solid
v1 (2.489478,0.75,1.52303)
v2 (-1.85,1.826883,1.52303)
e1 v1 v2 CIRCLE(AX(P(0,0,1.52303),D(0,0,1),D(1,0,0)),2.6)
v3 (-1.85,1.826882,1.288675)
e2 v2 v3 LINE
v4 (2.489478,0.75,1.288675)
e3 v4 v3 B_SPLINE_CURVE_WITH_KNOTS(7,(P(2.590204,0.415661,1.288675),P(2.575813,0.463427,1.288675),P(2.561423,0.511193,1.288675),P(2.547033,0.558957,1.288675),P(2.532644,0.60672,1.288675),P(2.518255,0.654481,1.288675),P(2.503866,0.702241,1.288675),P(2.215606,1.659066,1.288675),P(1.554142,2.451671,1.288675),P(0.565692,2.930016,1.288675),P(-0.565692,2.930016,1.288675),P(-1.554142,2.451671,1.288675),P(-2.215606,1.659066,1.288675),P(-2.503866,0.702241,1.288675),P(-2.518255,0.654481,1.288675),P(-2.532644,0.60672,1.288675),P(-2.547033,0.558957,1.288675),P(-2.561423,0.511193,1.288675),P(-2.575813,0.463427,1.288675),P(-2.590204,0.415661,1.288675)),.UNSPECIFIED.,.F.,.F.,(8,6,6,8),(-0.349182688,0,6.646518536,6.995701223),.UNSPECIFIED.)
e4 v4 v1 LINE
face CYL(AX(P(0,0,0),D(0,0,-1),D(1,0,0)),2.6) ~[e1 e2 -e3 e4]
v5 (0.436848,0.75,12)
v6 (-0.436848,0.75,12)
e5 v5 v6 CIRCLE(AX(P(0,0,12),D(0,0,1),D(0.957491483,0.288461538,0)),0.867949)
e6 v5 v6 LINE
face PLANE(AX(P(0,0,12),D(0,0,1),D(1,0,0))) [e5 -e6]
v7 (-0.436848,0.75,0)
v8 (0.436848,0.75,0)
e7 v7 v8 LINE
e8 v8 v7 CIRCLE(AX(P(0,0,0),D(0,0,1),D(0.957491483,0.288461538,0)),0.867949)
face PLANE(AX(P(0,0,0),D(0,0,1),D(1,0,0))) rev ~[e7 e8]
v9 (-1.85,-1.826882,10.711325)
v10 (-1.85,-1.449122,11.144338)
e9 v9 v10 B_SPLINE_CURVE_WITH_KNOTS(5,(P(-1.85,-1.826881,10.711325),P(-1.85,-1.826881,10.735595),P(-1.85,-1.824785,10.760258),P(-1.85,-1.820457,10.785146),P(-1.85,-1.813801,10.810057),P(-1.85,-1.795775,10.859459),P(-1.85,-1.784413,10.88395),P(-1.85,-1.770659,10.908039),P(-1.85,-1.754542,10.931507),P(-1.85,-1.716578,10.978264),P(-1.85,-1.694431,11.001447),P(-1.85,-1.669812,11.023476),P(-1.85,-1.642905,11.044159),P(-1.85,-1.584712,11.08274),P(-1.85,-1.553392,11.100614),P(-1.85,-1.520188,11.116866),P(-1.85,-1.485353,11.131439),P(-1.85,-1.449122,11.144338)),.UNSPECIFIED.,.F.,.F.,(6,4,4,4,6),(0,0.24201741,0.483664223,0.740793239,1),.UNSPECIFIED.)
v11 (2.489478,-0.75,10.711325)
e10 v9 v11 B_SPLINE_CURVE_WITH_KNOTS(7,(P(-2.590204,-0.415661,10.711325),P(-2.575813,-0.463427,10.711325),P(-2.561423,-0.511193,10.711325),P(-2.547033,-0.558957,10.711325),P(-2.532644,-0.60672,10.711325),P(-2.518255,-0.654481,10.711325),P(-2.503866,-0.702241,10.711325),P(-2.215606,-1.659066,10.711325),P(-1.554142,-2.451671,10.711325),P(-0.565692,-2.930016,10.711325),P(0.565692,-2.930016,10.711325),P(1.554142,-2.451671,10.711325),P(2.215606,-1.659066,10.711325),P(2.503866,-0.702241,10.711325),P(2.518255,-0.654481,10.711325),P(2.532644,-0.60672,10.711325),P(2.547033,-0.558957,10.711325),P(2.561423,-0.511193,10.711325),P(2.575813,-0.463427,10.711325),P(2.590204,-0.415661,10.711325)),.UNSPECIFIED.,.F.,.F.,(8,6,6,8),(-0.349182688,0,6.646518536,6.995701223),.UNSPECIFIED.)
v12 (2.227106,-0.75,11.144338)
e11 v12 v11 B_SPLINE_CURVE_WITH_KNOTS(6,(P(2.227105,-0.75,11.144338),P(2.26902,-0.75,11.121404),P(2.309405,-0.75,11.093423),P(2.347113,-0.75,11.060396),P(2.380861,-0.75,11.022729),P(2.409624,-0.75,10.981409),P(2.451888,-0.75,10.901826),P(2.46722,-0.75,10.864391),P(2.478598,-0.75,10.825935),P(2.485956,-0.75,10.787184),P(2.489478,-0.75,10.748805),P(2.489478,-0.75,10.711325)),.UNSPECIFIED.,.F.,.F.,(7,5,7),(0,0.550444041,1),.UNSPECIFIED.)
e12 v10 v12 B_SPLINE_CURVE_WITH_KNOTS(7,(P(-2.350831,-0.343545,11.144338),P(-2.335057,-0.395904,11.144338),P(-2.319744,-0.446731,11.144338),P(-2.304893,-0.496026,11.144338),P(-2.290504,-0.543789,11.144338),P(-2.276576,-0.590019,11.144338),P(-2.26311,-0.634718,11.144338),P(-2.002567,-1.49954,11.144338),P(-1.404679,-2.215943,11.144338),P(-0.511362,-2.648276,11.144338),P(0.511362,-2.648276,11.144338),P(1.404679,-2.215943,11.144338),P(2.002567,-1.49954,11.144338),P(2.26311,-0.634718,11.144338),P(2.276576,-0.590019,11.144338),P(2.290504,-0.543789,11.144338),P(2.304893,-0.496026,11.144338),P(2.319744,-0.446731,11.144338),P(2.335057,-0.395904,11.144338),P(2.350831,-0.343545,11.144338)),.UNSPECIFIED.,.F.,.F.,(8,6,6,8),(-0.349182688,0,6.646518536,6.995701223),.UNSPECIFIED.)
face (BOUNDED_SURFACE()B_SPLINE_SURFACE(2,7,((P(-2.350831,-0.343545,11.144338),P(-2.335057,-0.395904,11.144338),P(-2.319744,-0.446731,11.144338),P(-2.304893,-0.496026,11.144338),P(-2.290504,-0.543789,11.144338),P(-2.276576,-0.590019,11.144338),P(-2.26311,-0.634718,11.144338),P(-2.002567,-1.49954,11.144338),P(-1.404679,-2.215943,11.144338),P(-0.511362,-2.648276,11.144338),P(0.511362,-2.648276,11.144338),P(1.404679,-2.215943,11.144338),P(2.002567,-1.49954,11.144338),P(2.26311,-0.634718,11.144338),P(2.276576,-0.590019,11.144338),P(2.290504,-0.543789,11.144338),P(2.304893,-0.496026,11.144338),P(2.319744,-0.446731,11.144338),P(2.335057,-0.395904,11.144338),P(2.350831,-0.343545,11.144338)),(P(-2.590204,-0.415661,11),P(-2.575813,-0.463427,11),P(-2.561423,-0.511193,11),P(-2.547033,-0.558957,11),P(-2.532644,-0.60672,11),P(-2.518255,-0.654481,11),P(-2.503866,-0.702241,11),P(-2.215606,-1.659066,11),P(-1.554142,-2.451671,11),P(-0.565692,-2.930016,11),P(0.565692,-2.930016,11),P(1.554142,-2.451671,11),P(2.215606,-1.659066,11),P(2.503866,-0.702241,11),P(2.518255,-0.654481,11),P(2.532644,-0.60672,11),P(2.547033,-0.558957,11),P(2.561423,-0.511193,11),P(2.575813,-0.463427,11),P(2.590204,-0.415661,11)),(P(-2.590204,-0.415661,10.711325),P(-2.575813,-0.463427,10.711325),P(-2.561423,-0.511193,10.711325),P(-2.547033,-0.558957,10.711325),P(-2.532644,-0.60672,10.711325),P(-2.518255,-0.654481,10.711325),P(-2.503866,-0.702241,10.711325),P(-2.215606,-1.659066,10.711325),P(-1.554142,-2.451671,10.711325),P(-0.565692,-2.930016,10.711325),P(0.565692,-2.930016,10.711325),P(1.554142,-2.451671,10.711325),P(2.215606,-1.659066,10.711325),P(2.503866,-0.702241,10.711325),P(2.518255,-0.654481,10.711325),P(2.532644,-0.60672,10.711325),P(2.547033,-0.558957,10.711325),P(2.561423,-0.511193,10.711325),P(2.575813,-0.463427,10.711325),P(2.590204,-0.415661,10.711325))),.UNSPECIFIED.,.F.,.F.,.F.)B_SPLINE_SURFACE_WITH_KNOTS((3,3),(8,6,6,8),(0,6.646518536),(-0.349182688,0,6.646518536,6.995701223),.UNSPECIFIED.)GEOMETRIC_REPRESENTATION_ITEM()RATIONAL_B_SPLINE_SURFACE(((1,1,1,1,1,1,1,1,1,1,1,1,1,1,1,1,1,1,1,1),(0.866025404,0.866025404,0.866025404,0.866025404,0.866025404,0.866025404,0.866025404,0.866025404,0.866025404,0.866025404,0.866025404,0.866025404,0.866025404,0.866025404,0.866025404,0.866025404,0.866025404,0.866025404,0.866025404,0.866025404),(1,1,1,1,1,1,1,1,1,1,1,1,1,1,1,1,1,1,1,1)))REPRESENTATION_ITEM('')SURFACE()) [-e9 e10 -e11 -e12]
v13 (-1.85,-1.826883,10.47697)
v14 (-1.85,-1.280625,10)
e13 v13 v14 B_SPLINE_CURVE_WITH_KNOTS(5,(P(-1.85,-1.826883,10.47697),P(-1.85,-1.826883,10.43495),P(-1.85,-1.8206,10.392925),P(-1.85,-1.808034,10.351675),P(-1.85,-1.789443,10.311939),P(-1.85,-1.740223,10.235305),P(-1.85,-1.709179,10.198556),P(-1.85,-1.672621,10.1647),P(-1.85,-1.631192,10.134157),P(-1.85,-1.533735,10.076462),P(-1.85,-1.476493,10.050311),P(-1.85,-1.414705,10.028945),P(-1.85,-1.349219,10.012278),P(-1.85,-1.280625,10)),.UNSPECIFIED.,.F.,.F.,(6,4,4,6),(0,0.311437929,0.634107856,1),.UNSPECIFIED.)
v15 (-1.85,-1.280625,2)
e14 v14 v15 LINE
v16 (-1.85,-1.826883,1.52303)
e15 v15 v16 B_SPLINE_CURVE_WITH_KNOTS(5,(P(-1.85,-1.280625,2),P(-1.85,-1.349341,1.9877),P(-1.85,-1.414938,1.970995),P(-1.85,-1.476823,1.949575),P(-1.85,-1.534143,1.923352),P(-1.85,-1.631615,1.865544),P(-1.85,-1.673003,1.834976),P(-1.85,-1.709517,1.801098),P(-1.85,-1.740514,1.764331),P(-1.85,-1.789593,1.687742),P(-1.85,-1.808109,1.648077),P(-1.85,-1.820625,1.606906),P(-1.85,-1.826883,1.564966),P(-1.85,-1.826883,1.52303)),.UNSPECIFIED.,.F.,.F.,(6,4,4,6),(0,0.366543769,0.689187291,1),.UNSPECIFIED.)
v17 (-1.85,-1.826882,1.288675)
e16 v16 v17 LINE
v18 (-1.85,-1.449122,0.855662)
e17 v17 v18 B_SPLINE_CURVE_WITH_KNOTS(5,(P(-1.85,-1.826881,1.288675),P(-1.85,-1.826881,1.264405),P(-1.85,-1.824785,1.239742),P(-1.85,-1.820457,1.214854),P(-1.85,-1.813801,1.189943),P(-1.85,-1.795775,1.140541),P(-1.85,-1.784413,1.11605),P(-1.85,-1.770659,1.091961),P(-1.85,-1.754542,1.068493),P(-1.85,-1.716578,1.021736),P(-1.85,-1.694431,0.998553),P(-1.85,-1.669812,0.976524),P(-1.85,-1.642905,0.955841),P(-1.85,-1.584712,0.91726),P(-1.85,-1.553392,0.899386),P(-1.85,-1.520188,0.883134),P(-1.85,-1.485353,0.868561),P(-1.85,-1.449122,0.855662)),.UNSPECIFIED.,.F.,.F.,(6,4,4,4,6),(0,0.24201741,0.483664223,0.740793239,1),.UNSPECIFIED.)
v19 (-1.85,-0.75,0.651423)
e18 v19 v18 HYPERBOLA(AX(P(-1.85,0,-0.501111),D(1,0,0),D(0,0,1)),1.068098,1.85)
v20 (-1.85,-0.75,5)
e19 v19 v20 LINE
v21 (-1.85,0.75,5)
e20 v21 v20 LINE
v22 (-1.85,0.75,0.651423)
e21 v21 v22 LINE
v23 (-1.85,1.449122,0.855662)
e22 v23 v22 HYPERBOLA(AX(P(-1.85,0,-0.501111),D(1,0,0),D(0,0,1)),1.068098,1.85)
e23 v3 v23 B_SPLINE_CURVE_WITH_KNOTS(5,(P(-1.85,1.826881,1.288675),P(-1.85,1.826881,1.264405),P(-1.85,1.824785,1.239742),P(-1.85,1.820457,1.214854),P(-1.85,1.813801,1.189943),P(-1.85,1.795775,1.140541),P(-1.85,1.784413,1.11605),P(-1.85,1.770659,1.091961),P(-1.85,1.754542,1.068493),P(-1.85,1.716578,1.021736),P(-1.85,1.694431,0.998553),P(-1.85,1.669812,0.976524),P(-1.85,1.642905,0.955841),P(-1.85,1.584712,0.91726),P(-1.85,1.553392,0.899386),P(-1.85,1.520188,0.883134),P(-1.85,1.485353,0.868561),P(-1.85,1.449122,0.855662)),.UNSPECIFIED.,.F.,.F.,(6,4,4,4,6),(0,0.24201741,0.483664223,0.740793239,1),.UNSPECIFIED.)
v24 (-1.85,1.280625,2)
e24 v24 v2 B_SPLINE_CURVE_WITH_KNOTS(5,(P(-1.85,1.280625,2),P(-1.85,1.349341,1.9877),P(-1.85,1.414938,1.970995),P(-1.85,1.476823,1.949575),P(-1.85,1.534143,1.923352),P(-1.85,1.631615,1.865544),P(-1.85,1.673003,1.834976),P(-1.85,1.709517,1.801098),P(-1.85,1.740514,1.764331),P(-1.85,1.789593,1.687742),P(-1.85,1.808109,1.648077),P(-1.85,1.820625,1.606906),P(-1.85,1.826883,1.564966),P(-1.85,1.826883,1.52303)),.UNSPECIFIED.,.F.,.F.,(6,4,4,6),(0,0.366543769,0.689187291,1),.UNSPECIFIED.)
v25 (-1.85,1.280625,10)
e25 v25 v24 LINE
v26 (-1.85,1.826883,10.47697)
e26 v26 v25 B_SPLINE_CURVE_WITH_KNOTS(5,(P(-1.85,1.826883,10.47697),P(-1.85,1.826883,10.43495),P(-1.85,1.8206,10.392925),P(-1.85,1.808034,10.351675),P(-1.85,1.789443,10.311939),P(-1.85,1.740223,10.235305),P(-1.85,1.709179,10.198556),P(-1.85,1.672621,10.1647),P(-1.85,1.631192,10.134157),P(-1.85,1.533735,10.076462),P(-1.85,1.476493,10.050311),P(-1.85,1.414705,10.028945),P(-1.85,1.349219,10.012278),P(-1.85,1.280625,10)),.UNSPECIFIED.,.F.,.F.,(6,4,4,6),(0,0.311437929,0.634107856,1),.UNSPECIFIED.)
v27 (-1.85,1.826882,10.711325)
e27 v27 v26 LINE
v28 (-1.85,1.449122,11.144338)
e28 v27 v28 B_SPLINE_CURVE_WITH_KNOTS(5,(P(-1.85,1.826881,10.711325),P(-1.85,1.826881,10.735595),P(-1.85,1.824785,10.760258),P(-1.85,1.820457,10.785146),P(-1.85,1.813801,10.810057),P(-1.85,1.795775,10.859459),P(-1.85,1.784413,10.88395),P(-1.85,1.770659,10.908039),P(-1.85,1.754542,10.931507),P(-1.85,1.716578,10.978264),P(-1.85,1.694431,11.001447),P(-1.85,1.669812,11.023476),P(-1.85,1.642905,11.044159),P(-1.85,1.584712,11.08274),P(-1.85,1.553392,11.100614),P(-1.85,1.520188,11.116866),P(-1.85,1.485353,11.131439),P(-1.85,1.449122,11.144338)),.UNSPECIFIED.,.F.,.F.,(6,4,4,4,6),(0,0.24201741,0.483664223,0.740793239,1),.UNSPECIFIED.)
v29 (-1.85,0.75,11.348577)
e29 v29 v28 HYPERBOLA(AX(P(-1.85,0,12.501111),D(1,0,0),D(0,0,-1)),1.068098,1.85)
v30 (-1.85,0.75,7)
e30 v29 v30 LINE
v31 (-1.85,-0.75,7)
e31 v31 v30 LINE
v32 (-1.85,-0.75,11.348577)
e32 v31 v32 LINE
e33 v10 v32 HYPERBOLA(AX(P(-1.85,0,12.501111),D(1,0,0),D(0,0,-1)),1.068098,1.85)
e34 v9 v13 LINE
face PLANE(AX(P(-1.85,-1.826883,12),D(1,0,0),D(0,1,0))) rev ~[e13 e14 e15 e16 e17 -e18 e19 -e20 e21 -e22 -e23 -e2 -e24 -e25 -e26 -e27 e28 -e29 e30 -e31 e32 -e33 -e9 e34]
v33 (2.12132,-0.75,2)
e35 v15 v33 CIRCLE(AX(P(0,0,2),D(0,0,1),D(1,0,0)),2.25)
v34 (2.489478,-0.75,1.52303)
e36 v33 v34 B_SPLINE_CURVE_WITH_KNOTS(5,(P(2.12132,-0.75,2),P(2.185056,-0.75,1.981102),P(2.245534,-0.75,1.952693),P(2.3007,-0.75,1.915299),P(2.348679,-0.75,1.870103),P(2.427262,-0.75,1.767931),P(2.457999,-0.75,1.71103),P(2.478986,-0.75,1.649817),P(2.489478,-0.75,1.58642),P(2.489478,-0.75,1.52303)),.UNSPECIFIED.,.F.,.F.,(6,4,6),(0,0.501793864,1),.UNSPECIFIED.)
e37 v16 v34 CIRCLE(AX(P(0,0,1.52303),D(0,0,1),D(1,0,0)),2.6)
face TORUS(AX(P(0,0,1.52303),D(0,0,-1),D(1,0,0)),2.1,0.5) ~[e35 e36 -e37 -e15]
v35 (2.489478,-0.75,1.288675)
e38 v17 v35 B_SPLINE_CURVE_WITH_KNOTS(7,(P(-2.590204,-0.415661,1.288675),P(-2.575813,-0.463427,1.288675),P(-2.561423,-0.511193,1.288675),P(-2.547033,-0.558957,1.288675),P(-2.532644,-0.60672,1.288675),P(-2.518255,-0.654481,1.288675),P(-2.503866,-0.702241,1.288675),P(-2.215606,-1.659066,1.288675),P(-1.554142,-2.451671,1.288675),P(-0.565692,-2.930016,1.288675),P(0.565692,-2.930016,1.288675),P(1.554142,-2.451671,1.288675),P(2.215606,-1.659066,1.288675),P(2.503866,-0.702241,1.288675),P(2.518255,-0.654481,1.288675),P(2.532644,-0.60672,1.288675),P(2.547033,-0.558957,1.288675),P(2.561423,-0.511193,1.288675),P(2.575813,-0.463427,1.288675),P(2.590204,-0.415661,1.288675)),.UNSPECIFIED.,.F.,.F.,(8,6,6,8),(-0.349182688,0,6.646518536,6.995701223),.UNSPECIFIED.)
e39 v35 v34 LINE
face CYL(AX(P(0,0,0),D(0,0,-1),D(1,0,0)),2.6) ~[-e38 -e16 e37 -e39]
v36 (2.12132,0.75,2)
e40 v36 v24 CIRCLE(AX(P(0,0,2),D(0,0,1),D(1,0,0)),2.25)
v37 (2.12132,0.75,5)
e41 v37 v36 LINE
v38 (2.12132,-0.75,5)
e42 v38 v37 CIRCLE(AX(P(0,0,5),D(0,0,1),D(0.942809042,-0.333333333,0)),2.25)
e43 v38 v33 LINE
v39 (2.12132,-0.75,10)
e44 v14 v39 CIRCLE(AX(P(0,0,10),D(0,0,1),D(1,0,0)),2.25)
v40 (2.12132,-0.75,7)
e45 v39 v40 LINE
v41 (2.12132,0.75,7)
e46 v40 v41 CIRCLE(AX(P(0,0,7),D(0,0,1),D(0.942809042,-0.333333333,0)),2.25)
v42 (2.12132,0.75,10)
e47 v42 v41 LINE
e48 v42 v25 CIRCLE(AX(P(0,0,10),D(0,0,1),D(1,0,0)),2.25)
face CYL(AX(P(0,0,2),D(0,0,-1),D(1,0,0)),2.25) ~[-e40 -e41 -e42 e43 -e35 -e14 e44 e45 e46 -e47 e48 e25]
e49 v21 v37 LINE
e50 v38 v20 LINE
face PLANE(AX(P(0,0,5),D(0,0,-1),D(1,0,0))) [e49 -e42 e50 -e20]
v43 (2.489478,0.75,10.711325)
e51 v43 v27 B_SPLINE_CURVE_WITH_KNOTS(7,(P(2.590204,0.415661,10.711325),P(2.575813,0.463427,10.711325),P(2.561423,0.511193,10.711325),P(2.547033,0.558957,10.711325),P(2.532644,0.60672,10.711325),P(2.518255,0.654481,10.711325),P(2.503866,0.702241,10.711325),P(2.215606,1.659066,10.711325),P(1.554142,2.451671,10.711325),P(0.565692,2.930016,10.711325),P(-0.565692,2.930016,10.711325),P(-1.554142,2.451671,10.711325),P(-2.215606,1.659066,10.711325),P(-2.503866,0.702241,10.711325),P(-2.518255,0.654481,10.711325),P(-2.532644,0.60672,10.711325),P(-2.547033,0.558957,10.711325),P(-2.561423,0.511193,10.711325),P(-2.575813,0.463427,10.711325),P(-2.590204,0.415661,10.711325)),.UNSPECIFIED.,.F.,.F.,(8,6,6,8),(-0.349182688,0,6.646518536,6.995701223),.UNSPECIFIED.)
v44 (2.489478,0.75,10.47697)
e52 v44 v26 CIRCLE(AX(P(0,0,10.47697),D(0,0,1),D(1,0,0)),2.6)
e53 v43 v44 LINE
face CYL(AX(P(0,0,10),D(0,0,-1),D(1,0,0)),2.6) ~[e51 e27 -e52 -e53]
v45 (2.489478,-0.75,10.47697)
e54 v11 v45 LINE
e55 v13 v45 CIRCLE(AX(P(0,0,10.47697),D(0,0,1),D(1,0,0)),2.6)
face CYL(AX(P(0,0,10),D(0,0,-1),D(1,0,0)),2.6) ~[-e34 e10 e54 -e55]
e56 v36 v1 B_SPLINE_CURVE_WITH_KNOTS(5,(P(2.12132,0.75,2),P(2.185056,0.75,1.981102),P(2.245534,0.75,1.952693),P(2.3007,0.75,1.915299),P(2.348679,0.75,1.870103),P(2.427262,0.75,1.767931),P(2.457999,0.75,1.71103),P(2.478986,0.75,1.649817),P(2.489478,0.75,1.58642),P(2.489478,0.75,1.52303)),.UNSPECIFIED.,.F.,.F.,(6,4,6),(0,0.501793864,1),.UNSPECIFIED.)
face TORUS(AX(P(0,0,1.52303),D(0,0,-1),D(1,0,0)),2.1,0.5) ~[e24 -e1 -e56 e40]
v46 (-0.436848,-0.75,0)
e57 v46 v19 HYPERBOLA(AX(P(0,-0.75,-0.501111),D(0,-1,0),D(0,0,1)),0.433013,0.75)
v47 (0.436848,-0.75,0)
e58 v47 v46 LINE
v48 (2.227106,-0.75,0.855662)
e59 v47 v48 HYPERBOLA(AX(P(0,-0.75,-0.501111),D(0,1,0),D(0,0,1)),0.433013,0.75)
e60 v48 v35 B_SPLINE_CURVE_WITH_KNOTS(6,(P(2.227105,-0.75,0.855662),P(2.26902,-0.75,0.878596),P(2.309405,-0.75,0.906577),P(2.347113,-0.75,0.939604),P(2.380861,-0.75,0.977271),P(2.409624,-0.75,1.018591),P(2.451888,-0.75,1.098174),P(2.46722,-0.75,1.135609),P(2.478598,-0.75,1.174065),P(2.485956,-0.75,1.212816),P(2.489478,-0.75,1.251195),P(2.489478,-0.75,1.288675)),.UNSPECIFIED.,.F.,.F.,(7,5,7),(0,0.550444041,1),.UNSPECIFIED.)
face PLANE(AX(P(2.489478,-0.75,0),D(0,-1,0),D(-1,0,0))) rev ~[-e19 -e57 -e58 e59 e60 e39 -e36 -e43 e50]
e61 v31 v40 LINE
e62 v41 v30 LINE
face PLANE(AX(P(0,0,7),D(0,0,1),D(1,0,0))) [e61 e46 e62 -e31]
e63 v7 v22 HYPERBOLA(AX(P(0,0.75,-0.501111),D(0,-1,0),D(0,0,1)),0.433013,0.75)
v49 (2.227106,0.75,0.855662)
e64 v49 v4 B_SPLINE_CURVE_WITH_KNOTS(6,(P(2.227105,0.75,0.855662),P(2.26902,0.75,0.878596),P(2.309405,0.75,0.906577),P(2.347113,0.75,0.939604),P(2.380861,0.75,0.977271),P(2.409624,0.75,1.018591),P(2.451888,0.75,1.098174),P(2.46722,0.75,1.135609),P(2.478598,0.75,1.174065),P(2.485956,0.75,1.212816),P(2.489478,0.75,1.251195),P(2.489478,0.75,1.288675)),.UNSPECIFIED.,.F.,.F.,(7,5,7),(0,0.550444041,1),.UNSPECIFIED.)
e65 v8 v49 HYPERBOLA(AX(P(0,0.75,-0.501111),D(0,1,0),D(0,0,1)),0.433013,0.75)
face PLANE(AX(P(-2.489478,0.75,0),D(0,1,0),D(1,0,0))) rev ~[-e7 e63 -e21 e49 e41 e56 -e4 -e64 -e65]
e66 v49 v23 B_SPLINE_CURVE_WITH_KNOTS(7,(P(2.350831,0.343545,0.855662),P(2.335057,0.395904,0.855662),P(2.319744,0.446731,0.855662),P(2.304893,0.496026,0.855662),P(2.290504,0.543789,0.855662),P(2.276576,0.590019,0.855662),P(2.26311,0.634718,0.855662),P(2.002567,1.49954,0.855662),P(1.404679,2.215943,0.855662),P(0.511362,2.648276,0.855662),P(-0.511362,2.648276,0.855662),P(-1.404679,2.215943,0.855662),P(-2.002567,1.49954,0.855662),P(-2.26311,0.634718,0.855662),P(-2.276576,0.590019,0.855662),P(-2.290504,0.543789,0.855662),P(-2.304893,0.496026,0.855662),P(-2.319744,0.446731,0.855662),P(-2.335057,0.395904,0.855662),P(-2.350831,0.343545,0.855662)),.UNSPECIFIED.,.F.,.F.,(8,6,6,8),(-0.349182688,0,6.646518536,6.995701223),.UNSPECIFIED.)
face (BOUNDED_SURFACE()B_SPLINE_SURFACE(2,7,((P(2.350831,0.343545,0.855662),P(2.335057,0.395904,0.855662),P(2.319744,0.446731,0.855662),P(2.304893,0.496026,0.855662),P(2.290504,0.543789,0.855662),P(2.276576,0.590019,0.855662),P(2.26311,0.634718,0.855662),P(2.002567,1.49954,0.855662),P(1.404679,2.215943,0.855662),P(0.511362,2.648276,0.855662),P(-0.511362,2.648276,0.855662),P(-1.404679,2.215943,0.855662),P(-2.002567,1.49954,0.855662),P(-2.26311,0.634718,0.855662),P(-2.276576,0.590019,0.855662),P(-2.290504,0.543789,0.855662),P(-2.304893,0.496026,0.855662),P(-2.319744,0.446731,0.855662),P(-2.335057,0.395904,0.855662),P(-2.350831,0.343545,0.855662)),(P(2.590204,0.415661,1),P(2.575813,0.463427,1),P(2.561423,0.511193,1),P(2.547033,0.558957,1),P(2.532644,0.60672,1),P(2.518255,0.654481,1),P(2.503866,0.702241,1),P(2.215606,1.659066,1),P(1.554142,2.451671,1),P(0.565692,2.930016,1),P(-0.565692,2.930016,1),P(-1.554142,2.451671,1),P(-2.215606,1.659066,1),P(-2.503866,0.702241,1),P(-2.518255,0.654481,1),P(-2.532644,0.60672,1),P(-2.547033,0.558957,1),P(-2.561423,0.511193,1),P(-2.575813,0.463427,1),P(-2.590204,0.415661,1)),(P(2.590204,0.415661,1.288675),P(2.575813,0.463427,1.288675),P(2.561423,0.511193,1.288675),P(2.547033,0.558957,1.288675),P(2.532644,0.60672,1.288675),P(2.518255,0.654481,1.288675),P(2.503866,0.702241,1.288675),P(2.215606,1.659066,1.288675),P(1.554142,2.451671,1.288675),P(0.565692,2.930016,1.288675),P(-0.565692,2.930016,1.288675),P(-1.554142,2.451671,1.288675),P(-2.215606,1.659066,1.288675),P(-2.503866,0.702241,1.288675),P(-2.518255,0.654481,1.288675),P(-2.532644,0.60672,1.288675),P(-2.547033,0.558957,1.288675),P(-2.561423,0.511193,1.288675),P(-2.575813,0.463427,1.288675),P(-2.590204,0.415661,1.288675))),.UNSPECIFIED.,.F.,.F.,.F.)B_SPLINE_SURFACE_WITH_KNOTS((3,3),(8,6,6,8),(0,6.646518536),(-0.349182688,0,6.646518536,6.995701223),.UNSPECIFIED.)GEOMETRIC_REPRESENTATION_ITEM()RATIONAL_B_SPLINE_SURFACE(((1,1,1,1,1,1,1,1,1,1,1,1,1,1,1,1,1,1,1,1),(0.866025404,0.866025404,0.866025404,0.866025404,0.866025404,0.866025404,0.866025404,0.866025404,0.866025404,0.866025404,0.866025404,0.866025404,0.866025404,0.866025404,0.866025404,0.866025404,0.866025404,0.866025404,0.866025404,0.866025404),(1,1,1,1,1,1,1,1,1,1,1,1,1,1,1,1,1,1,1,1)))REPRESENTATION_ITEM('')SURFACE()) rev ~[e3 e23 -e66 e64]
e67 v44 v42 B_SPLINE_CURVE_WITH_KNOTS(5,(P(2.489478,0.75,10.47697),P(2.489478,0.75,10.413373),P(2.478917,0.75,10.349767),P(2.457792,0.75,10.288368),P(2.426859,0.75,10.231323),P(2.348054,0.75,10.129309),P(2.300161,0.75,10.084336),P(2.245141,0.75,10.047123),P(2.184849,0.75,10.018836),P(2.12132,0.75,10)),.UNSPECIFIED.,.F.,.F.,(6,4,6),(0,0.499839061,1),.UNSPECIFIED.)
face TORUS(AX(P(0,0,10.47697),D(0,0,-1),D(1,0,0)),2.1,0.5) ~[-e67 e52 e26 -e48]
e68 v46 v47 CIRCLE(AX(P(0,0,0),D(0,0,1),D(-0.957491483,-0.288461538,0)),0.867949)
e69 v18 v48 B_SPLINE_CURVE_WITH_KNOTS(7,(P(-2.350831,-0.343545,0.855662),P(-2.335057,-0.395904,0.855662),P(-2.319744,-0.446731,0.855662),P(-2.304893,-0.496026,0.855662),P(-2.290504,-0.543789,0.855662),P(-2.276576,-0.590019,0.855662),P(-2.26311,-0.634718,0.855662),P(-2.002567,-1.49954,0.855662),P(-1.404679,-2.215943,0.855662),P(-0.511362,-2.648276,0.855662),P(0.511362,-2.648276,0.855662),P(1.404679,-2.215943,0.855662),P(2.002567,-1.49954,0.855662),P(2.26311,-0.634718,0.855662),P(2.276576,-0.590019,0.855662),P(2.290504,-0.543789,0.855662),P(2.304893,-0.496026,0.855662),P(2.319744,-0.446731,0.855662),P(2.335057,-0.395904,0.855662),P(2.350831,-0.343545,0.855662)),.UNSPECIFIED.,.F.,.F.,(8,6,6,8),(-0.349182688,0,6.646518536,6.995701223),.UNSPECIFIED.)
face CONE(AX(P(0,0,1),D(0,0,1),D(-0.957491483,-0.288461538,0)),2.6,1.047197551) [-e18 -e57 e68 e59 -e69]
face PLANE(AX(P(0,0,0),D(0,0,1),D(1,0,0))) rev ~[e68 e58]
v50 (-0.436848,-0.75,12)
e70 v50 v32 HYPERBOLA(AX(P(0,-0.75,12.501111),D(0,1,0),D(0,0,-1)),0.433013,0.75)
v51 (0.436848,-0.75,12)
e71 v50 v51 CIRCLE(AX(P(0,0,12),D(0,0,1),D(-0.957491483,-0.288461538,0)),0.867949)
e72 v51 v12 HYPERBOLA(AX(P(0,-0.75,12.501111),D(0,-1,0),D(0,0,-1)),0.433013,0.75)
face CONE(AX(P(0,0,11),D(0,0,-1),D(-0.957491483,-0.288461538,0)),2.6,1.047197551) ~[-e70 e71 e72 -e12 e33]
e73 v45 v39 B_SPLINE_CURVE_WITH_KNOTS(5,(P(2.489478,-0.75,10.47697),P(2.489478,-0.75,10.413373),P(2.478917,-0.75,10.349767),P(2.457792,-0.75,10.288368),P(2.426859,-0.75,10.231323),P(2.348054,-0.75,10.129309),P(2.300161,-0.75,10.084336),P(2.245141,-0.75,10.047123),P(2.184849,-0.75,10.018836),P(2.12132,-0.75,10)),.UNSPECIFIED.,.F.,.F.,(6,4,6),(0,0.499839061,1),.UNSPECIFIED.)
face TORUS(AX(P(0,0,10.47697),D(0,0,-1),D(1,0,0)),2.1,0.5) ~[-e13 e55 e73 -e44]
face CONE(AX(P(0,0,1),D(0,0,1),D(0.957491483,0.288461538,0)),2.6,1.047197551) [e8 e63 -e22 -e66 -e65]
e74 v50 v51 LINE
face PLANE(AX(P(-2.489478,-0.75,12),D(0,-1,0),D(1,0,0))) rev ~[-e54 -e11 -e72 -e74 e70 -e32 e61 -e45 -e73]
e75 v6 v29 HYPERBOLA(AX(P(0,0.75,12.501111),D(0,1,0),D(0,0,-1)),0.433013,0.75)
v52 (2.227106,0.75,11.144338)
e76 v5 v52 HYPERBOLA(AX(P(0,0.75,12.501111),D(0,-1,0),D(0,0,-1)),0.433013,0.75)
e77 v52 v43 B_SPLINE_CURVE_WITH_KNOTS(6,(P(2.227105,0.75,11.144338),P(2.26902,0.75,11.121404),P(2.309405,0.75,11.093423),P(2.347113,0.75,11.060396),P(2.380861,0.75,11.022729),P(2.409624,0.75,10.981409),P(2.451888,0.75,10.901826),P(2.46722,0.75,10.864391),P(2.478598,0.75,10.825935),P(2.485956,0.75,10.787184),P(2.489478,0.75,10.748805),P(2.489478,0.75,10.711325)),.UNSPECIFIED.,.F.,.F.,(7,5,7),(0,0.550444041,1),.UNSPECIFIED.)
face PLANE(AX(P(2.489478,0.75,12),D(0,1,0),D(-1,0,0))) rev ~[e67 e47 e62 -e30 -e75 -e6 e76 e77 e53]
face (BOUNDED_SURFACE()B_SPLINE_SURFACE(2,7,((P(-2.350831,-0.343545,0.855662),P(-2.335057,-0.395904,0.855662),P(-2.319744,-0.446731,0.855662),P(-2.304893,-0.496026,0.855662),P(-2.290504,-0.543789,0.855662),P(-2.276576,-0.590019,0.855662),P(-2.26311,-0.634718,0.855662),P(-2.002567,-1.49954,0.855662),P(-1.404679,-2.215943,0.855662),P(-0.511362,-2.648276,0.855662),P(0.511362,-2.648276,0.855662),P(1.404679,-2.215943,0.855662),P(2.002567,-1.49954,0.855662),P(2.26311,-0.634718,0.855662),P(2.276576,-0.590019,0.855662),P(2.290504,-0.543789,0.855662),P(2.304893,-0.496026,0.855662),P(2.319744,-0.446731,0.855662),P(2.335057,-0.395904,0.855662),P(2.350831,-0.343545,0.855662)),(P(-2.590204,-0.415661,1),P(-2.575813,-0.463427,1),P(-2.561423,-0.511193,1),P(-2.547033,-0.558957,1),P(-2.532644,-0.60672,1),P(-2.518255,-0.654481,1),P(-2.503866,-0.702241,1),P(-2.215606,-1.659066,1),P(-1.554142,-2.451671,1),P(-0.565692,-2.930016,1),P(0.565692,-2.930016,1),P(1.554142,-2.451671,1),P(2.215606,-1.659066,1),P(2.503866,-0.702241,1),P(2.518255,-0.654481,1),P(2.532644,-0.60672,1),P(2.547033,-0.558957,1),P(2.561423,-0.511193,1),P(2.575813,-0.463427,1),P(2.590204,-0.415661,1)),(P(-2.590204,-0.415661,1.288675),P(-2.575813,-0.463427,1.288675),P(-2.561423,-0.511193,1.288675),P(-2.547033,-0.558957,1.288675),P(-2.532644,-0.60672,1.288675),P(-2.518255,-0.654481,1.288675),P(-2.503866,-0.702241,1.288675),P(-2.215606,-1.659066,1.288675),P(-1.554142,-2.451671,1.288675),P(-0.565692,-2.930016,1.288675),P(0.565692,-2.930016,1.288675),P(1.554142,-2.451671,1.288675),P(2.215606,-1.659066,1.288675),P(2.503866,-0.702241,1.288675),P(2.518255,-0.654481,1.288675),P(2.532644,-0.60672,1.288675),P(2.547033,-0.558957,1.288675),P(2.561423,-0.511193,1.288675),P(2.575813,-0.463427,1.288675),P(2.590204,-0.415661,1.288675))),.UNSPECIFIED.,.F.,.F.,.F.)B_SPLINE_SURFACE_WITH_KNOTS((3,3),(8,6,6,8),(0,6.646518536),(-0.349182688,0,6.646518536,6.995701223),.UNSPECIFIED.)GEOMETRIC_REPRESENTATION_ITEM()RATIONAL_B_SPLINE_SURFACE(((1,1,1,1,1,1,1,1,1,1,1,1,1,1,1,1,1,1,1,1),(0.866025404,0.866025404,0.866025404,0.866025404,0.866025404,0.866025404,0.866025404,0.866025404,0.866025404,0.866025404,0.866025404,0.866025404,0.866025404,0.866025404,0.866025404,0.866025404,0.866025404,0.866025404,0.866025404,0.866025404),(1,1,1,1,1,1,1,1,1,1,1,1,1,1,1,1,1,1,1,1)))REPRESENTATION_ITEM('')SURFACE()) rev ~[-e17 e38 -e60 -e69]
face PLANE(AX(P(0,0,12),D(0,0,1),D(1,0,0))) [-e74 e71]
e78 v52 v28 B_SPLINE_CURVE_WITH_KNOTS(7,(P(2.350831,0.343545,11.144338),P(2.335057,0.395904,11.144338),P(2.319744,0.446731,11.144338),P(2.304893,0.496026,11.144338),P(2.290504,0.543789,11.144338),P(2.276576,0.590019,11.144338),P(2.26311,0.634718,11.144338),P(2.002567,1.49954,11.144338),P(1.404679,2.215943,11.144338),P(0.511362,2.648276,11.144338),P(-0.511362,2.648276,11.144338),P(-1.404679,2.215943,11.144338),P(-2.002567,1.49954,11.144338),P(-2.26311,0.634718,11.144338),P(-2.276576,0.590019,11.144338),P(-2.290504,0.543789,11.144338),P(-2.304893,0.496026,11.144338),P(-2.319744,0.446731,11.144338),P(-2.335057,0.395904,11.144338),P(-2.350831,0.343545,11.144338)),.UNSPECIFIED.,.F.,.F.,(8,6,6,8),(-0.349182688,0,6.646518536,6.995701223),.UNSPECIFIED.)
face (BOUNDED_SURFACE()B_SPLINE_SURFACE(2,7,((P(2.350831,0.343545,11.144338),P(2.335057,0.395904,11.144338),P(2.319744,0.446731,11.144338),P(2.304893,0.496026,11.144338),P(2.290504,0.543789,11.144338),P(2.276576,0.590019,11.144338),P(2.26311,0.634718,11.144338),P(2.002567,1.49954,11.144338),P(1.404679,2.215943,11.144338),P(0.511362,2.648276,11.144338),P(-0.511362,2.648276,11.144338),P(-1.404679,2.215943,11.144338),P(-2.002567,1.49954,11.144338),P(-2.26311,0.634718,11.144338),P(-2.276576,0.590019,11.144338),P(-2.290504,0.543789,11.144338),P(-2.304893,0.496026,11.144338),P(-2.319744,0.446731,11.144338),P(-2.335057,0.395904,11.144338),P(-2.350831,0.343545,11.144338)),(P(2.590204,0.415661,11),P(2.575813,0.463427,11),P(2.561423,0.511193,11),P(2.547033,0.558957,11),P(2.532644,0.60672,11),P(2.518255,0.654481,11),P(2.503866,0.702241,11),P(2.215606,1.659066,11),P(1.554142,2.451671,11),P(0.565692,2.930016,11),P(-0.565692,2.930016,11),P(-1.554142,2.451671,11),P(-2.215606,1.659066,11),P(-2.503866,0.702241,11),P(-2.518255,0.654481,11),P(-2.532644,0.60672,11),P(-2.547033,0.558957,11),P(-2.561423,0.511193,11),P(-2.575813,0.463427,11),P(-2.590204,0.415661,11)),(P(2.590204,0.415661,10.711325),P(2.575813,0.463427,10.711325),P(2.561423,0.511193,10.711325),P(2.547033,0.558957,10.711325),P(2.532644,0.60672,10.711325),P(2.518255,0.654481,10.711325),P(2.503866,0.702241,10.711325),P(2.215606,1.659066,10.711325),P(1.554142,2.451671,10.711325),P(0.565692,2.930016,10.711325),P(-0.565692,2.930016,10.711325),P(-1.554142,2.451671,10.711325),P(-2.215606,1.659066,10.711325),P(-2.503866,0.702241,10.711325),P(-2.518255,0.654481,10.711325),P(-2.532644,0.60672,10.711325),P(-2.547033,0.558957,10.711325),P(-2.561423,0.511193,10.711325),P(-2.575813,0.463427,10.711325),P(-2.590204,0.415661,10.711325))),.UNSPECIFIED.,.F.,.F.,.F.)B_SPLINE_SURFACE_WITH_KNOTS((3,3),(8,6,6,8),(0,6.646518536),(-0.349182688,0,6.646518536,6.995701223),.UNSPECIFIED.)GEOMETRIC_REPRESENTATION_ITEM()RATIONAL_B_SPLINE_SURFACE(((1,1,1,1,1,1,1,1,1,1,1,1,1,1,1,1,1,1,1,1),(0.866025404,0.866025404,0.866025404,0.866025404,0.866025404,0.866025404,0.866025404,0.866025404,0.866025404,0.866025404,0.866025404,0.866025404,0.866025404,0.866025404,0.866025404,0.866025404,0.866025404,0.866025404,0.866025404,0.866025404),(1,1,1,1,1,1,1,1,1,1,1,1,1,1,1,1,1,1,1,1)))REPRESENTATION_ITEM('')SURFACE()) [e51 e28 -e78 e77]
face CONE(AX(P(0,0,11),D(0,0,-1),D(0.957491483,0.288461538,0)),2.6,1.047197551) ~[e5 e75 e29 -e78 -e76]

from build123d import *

# Parameters (mm, degrees)
F0_R         = 2.6
F1_DEPTH     = 2
F2_R         = 2.25
F3_DEPTH     = 8
F4_R         = 2.6
F5_DEPTH     = 2
F8_DEPTH     = 5
F10_DEPTH    = 5
F11_C1_SIZE2 = 1
F11_C1_SIZE  = 1.7320508076
F11_C2_SIZE2 = 1
F11_C2_SIZE  = 1.7320508076
F12_C1_SIZE2 = 1
F12_C1_SIZE  = 1.7320508076
F12_C2_SIZE2 = 1
F12_C2_SIZE  = 1.7320508076
F13_R        = 0.5
F15_DEPTH    = 25


# Not quite as in the source:
# - a fillet or chamfer that OpenCascade refuses, or shapes differently, is made with other operations: its cross-section is extruded or revolved along the edge and cut away or added


with BuildPart() as f1:
    # F0 (on Top) → F1 (new body)
    with BuildSketch(Plane.XY):
        Circle(F0_R)
    extrude(amount=F1_DEPTH)

    # F2 (on face) → F3 (join)
    with BuildSketch(Plane.XY.offset(2)):
        Circle(F2_R)
    extrude(amount=F3_DEPTH)

    # F4 (on face) → F5 (join)
    with BuildSketch(Plane.XY.offset(10)):
        Circle(F4_R)
    extrude(amount=F5_DEPTH)

    # F6: fillet of radius 0.5 on 2 edges, made by hand

    # F6_s1 → F6_t2 (revolve, cut)
    with BuildSketch(Plane.XZ):
        with BuildLine():
            ThreePointArc((2.25, 2), (2.5031128874, 1.8188343884), (2.6, 1.5230303993))
            Line((2.6, 1.5230303993), (2.6, 2))
            Line((2.6, 2), (2.25, 2))
        make_face()
    revolve(axis=Axis((0, 0, 2), (0, 0, 1)), mode=Mode.SUBTRACT)

    # F6_s3 → F6_t4 (revolve, cut)
    with BuildSketch(Plane.XZ):
        with BuildLine():
            ThreePointArc((2.6, 10.4769696007), (2.5031128874, 10.1811656116), (2.25, 10))
            Line((2.25, 10), (2.6, 10))
            Line((2.6, 10), (2.6, 10.4769696007))
        make_face()
    revolve(axis=Axis((0, 0, 10), (0, 0, 1)), mode=Mode.SUBTRACT)

    # F7 (on face) → F8 (cut)
    with BuildSketch(Plane(origin=(0, 0, 0), x_dir=(1, 0, 0), z_dir=(0, 0, -1))):
        with BuildLine():
            ThreePointArc((-2.4894778569, 0.75), (-2.6, 0), (-2.4894778569, -0.75))
            Line((-2.4894778569, -0.75), (2.4894778569, -0.75))
            ThreePointArc((2.4894778569, -0.75), (2.6, 0), (2.4894778569, 0.75))
            Line((2.4894778569, 0.75), (-2.4894778569, 0.75))
        make_face()
    extrude(amount=-F8_DEPTH, mode=Mode.SUBTRACT)

    # F9 (on face) → F10 (cut)
    with BuildSketch(Plane.XY.offset(12)):
        with BuildLine():
            ThreePointArc((-2.4894778569, 0.75), (-2.6, 0), (-2.4894778569, -0.75))
            Line((-2.4894778569, -0.75), (2.4894778569, -0.75))
            ThreePointArc((2.4894778569, -0.75), (2.6, 0), (2.4894778569, 0.75))
            Line((2.4894778569, 0.75), (-2.4894778569, 0.75))
        make_face()
    extrude(amount=-F10_DEPTH, mode=Mode.SUBTRACT)

    # F11: chamfer of 1 x 1.7320508076 on 2 edges, made by hand

    # F11_c1
    f11_c1_edges = [f1.edges().sort_by_distance(p)[0] for p in [
        (0, 2.6, 0),
    ]]
    f11_c1_side = f1.faces().sort_by_distance((0, 2.58, 0))[0]
    chamfer(f11_c1_edges, length=F11_C1_SIZE, length2=F11_C1_SIZE2, reference=f11_c1_side)

    # F11_c2
    f11_c2_edges = [f1.edges().sort_by_distance(p)[0] for p in [
        (0, -2.6, 0),
    ]]
    f11_c2_side = f1.faces().sort_by_distance((0, -2.58, 0))[0]
    chamfer(f11_c2_edges, length=F11_C2_SIZE, length2=F11_C2_SIZE2, reference=f11_c2_side)

    # F12: chamfer of 1 x 1.7320508076 on 2 edges, made by hand

    # F12_c1
    f12_c1_edges = [f1.edges().sort_by_distance(p)[0] for p in [
        (0, -2.6, 12),
    ]]
    f12_c1_side = f1.faces().sort_by_distance((0, -2.58, 12))[0]
    chamfer(f12_c1_edges, length=F12_C1_SIZE, length2=F12_C1_SIZE2, reference=f12_c1_side)

    # F12_c2
    f12_c2_edges = [f1.edges().sort_by_distance(p)[0] for p in [
        (0, 2.6, 12),
    ]]
    f12_c2_side = f1.faces().sort_by_distance((0, 2.58, 12))[0]
    chamfer(f12_c2_edges, length=F12_C2_SIZE, length2=F12_C2_SIZE2, reference=f12_c2_side)

    # F13
    f13_edges = [f1.edges().sort_by_distance(p)[0] for p in [
        (0, -2.6, 11),
        (0, 2.6, 11),
        (0, -2.6, 1),
        (0, 2.6, 1),
    ]]
    fillet(f13_edges, radius=F13_R)

    # F14 (on face) → F15 (cut)
    with BuildSketch(Plane.XY.offset(12)):
        with BuildLine():
            Line((-1.85, -1.8268825906), (-1.85, 1.8268825906))
            ThreePointArc((-1.85, 1.8268825906), (-2.6, 0), (-1.85, -1.8268825906))
        make_face()
    extrude(amount=-F15_DEPTH, mode=Mode.SUBTRACT)


solid = f1.part
